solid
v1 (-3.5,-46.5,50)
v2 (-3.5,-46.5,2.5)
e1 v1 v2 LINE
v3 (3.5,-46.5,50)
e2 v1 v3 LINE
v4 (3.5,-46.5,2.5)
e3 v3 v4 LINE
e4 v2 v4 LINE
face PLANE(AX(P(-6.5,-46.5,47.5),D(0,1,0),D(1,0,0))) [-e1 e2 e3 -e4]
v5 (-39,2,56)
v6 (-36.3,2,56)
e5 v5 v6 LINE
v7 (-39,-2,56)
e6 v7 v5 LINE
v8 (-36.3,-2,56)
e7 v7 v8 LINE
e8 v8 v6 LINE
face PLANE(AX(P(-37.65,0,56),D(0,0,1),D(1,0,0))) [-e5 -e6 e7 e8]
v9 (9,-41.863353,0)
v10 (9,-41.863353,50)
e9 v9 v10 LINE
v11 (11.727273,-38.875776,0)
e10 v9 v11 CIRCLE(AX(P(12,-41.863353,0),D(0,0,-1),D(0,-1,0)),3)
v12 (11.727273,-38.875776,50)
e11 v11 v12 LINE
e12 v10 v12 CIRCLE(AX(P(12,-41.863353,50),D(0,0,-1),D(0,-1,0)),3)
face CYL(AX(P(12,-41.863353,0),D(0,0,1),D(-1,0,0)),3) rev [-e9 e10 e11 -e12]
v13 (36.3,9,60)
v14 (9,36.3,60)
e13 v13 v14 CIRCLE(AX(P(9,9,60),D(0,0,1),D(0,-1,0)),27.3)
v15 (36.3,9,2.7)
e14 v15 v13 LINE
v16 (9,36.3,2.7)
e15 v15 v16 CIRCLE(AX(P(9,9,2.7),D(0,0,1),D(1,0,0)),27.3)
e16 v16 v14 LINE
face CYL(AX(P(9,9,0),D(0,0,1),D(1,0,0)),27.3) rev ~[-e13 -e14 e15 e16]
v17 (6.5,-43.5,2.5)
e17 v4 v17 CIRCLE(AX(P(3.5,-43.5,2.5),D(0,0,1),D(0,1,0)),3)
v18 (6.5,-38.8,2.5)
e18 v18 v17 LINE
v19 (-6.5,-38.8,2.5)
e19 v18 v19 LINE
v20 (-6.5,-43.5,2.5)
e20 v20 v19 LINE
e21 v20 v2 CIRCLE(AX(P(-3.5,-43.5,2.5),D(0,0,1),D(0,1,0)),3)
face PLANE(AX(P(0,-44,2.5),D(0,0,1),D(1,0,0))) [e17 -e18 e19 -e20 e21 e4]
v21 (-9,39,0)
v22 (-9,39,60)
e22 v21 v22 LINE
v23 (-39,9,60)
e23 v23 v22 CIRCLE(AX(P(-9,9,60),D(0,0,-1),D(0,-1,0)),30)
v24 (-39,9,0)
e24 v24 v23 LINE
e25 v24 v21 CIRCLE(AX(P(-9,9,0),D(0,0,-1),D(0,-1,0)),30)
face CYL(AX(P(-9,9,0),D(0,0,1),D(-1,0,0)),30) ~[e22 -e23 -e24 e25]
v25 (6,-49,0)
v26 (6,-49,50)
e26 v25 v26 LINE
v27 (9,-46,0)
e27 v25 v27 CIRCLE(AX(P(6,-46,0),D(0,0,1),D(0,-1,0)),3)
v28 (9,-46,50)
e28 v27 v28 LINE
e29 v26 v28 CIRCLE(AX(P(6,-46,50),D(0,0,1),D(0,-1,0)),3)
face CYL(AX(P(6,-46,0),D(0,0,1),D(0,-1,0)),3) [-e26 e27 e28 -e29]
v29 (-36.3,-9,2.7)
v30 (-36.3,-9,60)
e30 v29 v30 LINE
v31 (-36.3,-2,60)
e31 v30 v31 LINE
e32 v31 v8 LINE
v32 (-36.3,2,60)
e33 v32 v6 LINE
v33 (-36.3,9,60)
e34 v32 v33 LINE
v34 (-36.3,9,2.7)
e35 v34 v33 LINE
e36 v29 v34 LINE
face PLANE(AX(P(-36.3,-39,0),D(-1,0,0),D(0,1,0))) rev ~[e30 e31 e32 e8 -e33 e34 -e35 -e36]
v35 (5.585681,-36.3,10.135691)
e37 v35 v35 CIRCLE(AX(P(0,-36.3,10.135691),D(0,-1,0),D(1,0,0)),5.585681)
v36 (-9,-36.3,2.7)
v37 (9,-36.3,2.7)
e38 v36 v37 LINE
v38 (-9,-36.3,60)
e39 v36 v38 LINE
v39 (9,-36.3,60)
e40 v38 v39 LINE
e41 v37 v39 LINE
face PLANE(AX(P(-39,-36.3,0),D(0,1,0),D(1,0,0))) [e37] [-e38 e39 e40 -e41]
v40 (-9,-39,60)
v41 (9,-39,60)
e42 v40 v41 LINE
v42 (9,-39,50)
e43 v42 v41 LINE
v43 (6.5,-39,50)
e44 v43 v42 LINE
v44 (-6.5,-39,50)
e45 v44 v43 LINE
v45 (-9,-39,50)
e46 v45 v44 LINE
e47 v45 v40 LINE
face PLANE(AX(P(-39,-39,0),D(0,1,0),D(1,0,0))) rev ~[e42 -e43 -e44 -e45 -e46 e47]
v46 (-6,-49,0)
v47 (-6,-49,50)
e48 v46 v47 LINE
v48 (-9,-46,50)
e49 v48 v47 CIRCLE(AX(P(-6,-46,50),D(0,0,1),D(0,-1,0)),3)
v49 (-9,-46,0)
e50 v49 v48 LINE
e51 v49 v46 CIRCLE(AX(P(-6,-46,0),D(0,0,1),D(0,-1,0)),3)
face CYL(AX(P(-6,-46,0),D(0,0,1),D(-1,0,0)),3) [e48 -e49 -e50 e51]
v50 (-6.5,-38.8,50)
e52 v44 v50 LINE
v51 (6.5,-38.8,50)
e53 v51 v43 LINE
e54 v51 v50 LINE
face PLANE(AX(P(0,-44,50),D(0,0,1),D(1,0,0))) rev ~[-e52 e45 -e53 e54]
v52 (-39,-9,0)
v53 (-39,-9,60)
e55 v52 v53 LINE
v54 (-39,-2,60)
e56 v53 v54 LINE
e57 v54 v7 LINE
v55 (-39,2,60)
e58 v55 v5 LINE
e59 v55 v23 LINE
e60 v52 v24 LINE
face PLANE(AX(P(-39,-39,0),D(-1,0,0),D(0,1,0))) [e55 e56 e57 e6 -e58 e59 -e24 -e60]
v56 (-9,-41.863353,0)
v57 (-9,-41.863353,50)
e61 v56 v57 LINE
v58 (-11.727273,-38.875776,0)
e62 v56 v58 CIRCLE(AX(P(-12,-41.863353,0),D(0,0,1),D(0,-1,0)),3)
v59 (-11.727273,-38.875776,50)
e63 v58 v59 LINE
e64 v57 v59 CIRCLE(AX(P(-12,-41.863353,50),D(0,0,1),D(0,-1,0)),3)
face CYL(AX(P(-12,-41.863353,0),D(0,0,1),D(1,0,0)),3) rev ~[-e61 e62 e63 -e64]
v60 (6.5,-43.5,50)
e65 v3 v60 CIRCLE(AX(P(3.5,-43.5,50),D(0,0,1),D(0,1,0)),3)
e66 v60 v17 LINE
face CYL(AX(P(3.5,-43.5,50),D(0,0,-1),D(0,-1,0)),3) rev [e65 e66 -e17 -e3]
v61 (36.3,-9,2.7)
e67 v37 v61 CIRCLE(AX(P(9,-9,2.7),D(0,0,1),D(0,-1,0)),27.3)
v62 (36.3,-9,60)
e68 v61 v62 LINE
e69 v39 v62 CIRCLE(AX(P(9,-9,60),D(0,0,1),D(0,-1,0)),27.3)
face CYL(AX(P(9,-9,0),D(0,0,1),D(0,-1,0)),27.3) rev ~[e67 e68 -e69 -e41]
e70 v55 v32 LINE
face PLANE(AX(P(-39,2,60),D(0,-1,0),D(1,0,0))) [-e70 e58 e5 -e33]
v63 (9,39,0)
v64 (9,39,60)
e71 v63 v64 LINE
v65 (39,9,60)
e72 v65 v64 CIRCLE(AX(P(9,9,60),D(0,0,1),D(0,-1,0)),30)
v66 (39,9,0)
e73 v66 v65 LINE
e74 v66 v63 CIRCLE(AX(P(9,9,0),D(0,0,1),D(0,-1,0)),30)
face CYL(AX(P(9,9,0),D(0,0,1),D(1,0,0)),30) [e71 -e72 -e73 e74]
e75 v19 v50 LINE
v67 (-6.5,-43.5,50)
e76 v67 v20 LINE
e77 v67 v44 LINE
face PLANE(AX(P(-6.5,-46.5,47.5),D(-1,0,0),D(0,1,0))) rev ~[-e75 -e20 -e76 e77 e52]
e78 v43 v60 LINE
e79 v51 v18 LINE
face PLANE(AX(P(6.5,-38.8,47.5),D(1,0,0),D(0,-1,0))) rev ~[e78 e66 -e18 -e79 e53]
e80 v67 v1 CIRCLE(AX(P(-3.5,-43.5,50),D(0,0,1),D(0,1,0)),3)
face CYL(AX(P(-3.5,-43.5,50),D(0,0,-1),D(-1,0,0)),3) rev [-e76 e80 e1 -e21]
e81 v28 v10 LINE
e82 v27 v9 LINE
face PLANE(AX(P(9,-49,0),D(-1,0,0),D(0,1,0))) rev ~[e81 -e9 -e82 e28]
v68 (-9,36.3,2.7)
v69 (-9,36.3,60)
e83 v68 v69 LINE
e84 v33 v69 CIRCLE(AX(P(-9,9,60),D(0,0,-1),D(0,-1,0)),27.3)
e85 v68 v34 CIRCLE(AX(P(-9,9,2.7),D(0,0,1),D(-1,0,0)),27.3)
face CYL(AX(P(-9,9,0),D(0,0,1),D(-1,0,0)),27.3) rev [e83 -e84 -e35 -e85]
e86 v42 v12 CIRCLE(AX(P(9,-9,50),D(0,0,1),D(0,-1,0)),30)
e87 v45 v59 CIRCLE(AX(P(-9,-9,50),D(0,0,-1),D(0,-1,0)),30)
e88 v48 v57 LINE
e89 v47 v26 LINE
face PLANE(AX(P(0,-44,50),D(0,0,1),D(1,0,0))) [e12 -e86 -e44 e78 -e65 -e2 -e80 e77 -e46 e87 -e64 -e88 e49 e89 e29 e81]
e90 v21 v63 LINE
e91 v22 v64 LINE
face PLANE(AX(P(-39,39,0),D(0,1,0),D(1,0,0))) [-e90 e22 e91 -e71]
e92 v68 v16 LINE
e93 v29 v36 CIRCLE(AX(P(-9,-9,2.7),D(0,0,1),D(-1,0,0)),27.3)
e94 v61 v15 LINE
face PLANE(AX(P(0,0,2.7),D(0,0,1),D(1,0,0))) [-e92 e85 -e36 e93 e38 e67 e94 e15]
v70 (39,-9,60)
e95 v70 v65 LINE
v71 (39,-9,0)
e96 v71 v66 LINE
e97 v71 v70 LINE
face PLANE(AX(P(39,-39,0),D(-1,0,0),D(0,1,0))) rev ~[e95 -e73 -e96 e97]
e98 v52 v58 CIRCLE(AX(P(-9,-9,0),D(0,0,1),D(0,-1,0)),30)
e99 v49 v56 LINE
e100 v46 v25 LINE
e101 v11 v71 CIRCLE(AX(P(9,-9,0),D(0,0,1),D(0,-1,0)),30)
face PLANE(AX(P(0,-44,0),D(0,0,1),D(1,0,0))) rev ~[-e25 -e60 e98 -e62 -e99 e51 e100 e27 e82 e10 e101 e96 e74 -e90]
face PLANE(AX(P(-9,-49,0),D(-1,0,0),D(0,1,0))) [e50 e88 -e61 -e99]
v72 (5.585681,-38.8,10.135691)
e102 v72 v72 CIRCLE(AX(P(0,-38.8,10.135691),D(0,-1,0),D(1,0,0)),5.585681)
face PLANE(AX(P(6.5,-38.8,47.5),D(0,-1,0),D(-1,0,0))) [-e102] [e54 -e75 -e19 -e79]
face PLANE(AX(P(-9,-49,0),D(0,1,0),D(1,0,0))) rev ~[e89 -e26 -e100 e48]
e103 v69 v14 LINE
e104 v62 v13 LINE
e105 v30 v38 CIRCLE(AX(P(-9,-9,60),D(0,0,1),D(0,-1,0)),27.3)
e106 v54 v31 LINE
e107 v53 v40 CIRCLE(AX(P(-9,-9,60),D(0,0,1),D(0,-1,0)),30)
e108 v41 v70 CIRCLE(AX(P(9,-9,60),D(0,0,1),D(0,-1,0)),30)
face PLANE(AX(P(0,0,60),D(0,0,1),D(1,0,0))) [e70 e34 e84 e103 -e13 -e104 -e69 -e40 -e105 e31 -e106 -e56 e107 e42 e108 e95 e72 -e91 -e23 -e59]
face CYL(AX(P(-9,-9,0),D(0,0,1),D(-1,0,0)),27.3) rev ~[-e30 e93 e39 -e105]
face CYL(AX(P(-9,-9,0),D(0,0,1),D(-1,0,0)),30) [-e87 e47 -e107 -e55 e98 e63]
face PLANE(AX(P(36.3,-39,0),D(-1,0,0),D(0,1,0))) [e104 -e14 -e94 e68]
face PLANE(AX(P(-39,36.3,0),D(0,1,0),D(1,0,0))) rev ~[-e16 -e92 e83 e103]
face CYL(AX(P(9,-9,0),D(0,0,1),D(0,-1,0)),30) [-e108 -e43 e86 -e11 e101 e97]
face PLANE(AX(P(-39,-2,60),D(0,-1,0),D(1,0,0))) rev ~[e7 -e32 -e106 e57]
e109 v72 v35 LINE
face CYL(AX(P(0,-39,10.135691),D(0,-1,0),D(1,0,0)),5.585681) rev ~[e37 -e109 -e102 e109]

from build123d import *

# Parameters (mm, degrees)
F0_W      = 78
F0_H      = 78
F1_DEPTH  = 60
F2_R      = 30
F4_T      = -2.7
F3_W      = 18
F3_H      = 10
F5_DEPTH  = 25
F6_DEPTH  = 50
F7_T      = -2.5
F8_R      = 5.5856812821
F9_DEPTH  = 25
F10_R     = 3
F11_W     = 2.7
F11_H     = 4
F12_DEPTH = 4


# Not quite as in the source:
# - a shell that OpenCascade refuses in one call is made with other operations: the cavity is built on its own and cut out


with BuildPart() as f1:
    # F0 (on Top) → F1 (new body)
    with BuildSketch(Plane.XY):
        Rectangle(F0_W, F0_H)
    extrude(amount=F1_DEPTH)

    # F2
    f2_edges = [f1.edges().sort_by_distance(p)[0] for p in [
        (-39, -39, 30),
        (39, -39, 30),
        (39, 39, 30),
        (-39, 39, 30),
    ]]
    fillet(f2_edges, radius=F2_R)

    # F4
    f4_openings = [f1.faces().sort_by_distance(p)[0] for p in [
        (0, 0, 60),
    ]]
    offset(amount=F4_T, openings=f4_openings)

    # F3 (on Top) → F5 (cut)
    with BuildSketch(Plane.XY):
        with Locations((0, -44)):
            Rectangle(F3_W, F3_H)
    extrude(amount=-F5_DEPTH, mode=Mode.SUBTRACT)

    # F3 (on Top) → F6 (join)
    with BuildSketch(Plane.XY):
        with Locations((0, -44)):
            Rectangle(F3_W, F3_H)
    extrude(amount=F6_DEPTH)

    # F7: a shell. OpenCascade refuses it in one call, so the cavity is built on its own and cut out:
    # the body offset inwards by the wall thickness, plus a prism from it out through each open face.
    f7_core = offset(f1.part, amount=F7_T, kind=Kind.INTERSECTION, mode=Mode.PRIVATE)
    f7_exits = [f7_core.faces().sort_by_distance(p)[0] for p in [
        (0, -42.65, 47.5),
    ]]
    add(f7_core, mode=Mode.SUBTRACT)
    extrude(f7_exits, amount=-F7_T, mode=Mode.SUBTRACT)

    # F8 (on face) → F9 (cut)
    with BuildSketch(Plane.XZ.offset(39)):
        with Locations((0, 10.1356906816)):
            Circle(F8_R)
    extrude(amount=-F9_DEPTH, mode=Mode.SUBTRACT)

    # F10
    f10_edges = [f1.edges().sort_by_distance(p)[0] for p in [
        (-9, -49, 25),
        (9, -49, 25),
        (-6.5, -46.5, 26.25),
        (6.5, -46.5, 26.25),
        (-9, -39, 25),
        (-9, -39, 55),
        (9, -39, 25),
        (9, -39, 55),
    ]]
    fillet(f10_edges, radius=F10_R)

    # F11 (on face) → F12 (cut)
    with BuildSketch(Plane.XY.offset(60)):
        with Locations((-37.65, 0)):
            Rectangle(F11_W, F11_H)
    extrude(amount=-F12_DEPTH, mode=Mode.SUBTRACT)


solid = f1.part
